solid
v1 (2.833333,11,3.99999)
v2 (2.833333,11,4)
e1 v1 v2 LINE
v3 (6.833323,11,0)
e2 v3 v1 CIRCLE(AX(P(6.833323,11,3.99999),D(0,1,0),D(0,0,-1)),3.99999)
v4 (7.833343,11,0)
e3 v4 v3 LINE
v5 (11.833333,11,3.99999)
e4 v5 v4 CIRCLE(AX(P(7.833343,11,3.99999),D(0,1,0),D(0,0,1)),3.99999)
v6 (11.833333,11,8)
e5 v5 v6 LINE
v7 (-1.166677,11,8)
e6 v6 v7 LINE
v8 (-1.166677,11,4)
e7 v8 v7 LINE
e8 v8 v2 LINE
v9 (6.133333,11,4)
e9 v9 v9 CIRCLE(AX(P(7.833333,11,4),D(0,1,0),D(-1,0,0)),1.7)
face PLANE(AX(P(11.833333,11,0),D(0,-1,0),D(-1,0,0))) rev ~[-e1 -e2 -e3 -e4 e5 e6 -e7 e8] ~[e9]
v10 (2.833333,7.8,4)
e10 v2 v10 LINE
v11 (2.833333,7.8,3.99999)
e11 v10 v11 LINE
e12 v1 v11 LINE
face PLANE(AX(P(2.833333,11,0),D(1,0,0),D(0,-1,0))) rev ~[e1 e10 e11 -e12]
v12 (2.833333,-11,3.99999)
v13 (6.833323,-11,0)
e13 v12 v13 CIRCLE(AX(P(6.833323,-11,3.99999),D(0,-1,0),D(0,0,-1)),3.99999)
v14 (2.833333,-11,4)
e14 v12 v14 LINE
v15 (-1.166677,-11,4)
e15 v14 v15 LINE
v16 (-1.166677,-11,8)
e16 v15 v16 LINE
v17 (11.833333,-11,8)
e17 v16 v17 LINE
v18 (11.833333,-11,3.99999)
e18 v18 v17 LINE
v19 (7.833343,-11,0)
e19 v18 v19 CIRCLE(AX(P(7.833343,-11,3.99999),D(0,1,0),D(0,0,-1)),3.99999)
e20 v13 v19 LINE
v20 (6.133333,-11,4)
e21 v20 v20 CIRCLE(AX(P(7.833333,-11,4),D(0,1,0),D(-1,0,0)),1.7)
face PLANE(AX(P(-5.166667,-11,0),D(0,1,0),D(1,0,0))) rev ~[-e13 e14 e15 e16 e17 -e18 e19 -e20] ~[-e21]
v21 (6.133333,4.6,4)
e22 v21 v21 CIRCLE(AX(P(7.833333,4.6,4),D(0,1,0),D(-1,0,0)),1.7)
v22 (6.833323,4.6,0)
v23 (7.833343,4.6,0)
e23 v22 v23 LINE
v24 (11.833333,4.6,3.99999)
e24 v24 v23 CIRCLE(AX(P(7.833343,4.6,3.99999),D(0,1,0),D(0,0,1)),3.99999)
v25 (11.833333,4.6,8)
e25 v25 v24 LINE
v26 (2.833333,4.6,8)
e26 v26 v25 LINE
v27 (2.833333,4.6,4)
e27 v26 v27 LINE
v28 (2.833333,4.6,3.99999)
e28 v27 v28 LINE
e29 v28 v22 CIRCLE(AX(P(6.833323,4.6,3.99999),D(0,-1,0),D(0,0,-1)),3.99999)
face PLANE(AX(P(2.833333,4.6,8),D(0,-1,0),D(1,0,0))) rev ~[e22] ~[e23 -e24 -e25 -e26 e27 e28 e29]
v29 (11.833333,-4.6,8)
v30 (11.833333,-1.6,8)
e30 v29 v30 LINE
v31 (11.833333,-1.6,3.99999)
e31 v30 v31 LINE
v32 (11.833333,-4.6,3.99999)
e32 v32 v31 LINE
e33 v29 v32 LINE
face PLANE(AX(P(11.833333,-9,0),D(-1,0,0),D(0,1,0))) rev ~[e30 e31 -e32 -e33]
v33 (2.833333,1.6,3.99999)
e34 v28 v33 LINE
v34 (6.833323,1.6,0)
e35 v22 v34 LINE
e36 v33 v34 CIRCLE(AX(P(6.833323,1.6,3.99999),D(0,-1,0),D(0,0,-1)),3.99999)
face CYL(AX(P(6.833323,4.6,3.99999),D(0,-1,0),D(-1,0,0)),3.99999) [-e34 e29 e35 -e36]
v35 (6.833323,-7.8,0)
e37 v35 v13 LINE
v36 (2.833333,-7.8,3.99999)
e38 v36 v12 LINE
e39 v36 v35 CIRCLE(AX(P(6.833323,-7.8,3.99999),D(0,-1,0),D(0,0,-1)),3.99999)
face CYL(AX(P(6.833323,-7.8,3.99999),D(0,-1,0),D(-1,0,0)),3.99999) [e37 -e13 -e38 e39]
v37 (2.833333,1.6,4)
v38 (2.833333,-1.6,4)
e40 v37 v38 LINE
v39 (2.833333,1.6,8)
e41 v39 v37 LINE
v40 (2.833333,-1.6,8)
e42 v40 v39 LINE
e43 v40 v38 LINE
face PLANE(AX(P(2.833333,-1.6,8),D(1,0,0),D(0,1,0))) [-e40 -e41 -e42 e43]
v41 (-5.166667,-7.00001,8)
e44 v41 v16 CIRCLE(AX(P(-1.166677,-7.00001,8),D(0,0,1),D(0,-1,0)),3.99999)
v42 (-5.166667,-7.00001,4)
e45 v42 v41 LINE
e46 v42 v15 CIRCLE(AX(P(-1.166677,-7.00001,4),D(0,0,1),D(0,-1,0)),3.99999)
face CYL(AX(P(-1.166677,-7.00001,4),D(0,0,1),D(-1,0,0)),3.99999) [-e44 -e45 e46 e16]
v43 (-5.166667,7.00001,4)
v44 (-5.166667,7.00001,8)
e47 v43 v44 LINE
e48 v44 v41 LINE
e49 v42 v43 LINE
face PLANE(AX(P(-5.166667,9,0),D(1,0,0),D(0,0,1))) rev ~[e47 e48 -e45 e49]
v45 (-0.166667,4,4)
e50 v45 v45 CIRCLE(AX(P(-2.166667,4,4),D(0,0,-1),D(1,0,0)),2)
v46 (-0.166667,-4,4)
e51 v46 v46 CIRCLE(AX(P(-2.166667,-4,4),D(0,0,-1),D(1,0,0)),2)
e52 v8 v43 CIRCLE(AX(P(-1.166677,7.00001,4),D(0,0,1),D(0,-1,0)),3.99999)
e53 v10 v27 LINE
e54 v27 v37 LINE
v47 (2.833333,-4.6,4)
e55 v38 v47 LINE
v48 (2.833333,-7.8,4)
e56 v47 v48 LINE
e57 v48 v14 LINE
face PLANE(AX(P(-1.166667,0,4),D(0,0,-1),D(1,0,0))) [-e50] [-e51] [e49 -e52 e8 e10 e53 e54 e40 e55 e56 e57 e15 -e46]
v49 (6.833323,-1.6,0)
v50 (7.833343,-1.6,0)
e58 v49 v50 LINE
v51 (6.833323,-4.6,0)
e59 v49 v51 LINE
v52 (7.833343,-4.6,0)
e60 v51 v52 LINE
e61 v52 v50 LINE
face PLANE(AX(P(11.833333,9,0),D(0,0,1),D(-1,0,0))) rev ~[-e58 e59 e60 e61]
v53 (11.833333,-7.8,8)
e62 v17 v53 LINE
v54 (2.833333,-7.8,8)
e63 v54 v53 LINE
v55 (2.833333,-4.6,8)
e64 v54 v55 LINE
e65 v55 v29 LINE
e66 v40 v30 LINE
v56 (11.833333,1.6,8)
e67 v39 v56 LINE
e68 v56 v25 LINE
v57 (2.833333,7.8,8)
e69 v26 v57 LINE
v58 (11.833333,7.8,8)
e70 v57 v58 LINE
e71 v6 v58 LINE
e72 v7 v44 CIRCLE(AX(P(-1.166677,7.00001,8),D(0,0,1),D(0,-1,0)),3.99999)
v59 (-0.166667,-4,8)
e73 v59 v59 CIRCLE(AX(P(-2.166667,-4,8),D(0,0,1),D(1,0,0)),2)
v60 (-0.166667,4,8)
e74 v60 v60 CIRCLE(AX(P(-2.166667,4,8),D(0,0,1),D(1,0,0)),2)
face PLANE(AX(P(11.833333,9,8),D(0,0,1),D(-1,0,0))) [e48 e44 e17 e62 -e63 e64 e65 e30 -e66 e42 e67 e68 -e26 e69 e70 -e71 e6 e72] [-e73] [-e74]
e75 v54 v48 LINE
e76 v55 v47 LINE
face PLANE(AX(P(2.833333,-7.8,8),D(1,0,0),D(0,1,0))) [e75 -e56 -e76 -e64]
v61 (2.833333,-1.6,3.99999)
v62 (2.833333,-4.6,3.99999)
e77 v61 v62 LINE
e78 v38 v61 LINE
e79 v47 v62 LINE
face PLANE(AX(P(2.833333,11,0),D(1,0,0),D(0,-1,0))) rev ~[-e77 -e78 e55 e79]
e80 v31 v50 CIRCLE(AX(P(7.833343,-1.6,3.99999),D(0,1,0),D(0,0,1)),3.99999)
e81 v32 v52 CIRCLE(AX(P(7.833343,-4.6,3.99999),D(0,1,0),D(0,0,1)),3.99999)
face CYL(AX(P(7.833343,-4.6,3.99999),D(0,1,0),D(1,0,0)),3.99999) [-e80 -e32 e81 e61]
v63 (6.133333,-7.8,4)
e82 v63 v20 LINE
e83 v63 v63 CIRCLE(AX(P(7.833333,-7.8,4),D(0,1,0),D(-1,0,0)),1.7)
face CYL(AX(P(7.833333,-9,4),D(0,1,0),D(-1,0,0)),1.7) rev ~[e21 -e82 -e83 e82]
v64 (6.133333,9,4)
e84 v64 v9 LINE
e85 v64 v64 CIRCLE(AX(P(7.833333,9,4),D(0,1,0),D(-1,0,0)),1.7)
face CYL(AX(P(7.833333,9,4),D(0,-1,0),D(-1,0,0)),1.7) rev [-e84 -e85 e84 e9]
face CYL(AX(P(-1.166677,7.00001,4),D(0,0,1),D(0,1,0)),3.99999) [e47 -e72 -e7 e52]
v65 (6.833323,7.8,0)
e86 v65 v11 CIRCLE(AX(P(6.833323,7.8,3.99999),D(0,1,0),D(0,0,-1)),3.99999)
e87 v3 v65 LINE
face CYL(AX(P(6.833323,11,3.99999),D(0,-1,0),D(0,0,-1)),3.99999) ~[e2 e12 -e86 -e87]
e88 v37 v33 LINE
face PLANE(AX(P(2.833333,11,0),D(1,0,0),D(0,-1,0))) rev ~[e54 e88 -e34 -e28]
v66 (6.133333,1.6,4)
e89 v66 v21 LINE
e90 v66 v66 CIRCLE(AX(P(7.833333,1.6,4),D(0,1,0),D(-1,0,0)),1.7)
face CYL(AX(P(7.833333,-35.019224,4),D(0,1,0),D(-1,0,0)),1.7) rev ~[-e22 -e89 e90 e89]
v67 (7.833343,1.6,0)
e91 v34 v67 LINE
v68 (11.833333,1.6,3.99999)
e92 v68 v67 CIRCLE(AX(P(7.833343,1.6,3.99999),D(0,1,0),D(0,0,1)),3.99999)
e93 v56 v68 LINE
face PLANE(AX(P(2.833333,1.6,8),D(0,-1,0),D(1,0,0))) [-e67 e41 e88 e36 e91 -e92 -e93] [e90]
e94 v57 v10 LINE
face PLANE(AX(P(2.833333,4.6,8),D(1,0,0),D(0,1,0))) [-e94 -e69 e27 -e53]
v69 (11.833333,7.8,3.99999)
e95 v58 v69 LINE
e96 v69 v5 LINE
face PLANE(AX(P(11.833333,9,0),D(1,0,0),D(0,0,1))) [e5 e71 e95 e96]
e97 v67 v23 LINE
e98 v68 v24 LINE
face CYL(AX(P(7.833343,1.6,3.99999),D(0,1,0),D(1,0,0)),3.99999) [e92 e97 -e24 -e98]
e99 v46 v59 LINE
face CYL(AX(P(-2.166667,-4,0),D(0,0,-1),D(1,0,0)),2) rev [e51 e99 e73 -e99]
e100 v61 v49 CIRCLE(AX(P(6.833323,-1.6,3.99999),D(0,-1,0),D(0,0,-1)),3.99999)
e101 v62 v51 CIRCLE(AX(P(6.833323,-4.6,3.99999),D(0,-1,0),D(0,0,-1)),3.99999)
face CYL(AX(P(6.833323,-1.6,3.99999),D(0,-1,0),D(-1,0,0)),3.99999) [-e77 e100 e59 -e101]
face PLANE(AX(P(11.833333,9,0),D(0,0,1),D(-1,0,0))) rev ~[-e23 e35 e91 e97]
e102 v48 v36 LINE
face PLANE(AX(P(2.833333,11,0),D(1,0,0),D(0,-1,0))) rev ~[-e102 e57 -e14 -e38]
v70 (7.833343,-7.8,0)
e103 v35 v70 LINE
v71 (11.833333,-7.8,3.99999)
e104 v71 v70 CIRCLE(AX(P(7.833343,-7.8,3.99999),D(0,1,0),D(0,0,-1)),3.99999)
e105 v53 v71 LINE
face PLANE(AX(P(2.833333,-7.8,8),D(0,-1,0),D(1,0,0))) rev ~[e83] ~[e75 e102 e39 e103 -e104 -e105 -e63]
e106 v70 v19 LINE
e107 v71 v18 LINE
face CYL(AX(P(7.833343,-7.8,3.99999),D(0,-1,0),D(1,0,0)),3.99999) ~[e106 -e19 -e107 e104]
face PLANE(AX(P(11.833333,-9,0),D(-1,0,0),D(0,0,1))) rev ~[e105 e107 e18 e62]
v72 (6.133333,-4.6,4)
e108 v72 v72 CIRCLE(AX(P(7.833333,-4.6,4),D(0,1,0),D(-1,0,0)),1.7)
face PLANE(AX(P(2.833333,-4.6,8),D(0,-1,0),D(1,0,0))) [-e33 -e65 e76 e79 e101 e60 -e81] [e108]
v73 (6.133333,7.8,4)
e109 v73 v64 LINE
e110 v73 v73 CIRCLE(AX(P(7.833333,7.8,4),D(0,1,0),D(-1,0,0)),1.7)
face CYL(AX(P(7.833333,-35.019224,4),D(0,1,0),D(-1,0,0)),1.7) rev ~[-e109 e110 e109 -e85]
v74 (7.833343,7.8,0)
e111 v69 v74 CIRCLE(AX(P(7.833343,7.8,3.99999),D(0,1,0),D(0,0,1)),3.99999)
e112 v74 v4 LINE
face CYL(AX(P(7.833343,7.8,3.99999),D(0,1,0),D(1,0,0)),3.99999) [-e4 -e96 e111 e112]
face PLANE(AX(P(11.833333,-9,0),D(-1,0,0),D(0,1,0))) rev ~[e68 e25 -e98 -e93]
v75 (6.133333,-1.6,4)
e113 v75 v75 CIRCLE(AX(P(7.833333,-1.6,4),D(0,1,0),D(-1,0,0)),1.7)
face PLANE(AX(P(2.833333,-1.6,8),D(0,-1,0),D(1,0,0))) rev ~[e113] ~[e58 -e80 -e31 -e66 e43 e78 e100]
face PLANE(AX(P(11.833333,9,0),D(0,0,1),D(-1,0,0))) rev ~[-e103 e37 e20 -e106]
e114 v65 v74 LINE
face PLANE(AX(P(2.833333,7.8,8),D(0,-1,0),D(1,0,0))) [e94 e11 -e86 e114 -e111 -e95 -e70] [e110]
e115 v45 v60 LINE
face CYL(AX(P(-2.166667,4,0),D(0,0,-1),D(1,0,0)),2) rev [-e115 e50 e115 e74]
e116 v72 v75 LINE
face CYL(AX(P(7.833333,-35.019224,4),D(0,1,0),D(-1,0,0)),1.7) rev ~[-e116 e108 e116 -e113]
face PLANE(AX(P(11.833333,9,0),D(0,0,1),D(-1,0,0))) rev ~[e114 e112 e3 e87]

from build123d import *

# Parameters (mm, degrees)
F0_W     = 7
F0_H     = 18
F0_R     = 2
F0_W_2   = 10
F1_DEPTH = 8
F3_D     = 3.4
F4_W     = 9
F4_H     = 3.2
F5_DEPTH = 25
F6_DEPTH = 2
F7_DEPTH = 2
F8_R     = 2
F9_DEPTH = 4
F10_R    = 3.99999


# Not quite as in the source:
# - a fillet or chamfer is up to 0.001 mm smaller than in the source, because OpenCascade refuses the exact size


with BuildPart() as f1:
    # F0 (on Top) → F1 (new body)
    with BuildSketch(Plane.XY):
        with Locations((-1.6666666667, 0)):
            Rectangle(F0_W, F0_H)
        with Locations((-2.1666666667, -4)):
            Circle(F0_R, mode=Mode.SUBTRACT)
        with Locations((-2.1666666667, 4)):
            Circle(F0_R, mode=Mode.SUBTRACT)
        with Locations((6.8333333333, 0)):
            Rectangle(F0_W_2, F0_H)
    extrude(amount=F1_DEPTH)

    # F3 (through all)
    with Locations(Plane.XZ.offset(9)):
        with Locations((7.8333333333, 4)):
            Hole(F3_D / 2)

    # F4 (on face) → F5 (cut)
    with BuildSketch(Plane.XY.offset(8)):
        with Locations((7.3333333333, 6.2)):
            Rectangle(F4_W, F4_H)
        with Locations((7.3333333333, 0)):
            Rectangle(F4_W, F4_H)
        with Locations((7.3333333333, -6.2)):
            Rectangle(F4_W, F4_H)
    extrude(amount=-F5_DEPTH, mode=Mode.SUBTRACT)

    # F6 (add): a face of the model
    f6_faces = [f1.faces().sort_by_distance(p)[0] for p in [
        (3.0114285443, -9, 4),
    ]]
    extrude(f6_faces, amount=F6_DEPTH)

    # F7 (add): a face of the model
    f7_faces = [f1.faces().sort_by_distance(p)[0] for p in [
        (3.0114285443, 9, 4),
    ]]
    extrude(f7_faces, amount=F7_DEPTH)

    # F8 (on face) → F9 (cut)
    with BuildSketch(Plane(origin=(0, 0, 0), x_dir=(1, 0, 0), z_dir=(0, 0, -1))):
        Polygon((2.8333333333, 7.8), (2.8333333333, 11), (-5.1666666667, 11), (-5.1666666667, -11), (2.8333333333, -11), (2.8333333333, -7.8), (2.8333333333, -4.6), (2.8333333333, -1.6), (2.8333333333, 1.6), (2.8333333333, 4.6), align=None)
        with Locations((-2.1666666667, -4)):
            Circle(F8_R, mode=Mode.SUBTRACT)
        with Locations((-2.1666666667, 4)):
            Circle(F8_R, mode=Mode.SUBTRACT)
    extrude(amount=-F9_DEPTH, mode=Mode.SUBTRACT)

    # F10 (radius 4 in the source; OpenCascade refuses exactly that, so slightly less here)
    f10_edges = [f1.edges().sort_by_distance(p)[0] for p in [
        (-5.166667, -11, 6),
        (-5.166667, 11, 6),
        (2.833333, -9.4, 0),
        (2.833333, -3.1, 0),
        (2.833333, 3.1, 0),
        (2.833333, 9.4, 0),
        (11.833333, -9.4, 0),
        (11.833333, -3.1, 0),
        (11.833333, 3.1, 0),
        (11.833333, 9.4, 0),
    ]]
    fillet(f10_edges, radius=F10_R)


solid = f1.part
